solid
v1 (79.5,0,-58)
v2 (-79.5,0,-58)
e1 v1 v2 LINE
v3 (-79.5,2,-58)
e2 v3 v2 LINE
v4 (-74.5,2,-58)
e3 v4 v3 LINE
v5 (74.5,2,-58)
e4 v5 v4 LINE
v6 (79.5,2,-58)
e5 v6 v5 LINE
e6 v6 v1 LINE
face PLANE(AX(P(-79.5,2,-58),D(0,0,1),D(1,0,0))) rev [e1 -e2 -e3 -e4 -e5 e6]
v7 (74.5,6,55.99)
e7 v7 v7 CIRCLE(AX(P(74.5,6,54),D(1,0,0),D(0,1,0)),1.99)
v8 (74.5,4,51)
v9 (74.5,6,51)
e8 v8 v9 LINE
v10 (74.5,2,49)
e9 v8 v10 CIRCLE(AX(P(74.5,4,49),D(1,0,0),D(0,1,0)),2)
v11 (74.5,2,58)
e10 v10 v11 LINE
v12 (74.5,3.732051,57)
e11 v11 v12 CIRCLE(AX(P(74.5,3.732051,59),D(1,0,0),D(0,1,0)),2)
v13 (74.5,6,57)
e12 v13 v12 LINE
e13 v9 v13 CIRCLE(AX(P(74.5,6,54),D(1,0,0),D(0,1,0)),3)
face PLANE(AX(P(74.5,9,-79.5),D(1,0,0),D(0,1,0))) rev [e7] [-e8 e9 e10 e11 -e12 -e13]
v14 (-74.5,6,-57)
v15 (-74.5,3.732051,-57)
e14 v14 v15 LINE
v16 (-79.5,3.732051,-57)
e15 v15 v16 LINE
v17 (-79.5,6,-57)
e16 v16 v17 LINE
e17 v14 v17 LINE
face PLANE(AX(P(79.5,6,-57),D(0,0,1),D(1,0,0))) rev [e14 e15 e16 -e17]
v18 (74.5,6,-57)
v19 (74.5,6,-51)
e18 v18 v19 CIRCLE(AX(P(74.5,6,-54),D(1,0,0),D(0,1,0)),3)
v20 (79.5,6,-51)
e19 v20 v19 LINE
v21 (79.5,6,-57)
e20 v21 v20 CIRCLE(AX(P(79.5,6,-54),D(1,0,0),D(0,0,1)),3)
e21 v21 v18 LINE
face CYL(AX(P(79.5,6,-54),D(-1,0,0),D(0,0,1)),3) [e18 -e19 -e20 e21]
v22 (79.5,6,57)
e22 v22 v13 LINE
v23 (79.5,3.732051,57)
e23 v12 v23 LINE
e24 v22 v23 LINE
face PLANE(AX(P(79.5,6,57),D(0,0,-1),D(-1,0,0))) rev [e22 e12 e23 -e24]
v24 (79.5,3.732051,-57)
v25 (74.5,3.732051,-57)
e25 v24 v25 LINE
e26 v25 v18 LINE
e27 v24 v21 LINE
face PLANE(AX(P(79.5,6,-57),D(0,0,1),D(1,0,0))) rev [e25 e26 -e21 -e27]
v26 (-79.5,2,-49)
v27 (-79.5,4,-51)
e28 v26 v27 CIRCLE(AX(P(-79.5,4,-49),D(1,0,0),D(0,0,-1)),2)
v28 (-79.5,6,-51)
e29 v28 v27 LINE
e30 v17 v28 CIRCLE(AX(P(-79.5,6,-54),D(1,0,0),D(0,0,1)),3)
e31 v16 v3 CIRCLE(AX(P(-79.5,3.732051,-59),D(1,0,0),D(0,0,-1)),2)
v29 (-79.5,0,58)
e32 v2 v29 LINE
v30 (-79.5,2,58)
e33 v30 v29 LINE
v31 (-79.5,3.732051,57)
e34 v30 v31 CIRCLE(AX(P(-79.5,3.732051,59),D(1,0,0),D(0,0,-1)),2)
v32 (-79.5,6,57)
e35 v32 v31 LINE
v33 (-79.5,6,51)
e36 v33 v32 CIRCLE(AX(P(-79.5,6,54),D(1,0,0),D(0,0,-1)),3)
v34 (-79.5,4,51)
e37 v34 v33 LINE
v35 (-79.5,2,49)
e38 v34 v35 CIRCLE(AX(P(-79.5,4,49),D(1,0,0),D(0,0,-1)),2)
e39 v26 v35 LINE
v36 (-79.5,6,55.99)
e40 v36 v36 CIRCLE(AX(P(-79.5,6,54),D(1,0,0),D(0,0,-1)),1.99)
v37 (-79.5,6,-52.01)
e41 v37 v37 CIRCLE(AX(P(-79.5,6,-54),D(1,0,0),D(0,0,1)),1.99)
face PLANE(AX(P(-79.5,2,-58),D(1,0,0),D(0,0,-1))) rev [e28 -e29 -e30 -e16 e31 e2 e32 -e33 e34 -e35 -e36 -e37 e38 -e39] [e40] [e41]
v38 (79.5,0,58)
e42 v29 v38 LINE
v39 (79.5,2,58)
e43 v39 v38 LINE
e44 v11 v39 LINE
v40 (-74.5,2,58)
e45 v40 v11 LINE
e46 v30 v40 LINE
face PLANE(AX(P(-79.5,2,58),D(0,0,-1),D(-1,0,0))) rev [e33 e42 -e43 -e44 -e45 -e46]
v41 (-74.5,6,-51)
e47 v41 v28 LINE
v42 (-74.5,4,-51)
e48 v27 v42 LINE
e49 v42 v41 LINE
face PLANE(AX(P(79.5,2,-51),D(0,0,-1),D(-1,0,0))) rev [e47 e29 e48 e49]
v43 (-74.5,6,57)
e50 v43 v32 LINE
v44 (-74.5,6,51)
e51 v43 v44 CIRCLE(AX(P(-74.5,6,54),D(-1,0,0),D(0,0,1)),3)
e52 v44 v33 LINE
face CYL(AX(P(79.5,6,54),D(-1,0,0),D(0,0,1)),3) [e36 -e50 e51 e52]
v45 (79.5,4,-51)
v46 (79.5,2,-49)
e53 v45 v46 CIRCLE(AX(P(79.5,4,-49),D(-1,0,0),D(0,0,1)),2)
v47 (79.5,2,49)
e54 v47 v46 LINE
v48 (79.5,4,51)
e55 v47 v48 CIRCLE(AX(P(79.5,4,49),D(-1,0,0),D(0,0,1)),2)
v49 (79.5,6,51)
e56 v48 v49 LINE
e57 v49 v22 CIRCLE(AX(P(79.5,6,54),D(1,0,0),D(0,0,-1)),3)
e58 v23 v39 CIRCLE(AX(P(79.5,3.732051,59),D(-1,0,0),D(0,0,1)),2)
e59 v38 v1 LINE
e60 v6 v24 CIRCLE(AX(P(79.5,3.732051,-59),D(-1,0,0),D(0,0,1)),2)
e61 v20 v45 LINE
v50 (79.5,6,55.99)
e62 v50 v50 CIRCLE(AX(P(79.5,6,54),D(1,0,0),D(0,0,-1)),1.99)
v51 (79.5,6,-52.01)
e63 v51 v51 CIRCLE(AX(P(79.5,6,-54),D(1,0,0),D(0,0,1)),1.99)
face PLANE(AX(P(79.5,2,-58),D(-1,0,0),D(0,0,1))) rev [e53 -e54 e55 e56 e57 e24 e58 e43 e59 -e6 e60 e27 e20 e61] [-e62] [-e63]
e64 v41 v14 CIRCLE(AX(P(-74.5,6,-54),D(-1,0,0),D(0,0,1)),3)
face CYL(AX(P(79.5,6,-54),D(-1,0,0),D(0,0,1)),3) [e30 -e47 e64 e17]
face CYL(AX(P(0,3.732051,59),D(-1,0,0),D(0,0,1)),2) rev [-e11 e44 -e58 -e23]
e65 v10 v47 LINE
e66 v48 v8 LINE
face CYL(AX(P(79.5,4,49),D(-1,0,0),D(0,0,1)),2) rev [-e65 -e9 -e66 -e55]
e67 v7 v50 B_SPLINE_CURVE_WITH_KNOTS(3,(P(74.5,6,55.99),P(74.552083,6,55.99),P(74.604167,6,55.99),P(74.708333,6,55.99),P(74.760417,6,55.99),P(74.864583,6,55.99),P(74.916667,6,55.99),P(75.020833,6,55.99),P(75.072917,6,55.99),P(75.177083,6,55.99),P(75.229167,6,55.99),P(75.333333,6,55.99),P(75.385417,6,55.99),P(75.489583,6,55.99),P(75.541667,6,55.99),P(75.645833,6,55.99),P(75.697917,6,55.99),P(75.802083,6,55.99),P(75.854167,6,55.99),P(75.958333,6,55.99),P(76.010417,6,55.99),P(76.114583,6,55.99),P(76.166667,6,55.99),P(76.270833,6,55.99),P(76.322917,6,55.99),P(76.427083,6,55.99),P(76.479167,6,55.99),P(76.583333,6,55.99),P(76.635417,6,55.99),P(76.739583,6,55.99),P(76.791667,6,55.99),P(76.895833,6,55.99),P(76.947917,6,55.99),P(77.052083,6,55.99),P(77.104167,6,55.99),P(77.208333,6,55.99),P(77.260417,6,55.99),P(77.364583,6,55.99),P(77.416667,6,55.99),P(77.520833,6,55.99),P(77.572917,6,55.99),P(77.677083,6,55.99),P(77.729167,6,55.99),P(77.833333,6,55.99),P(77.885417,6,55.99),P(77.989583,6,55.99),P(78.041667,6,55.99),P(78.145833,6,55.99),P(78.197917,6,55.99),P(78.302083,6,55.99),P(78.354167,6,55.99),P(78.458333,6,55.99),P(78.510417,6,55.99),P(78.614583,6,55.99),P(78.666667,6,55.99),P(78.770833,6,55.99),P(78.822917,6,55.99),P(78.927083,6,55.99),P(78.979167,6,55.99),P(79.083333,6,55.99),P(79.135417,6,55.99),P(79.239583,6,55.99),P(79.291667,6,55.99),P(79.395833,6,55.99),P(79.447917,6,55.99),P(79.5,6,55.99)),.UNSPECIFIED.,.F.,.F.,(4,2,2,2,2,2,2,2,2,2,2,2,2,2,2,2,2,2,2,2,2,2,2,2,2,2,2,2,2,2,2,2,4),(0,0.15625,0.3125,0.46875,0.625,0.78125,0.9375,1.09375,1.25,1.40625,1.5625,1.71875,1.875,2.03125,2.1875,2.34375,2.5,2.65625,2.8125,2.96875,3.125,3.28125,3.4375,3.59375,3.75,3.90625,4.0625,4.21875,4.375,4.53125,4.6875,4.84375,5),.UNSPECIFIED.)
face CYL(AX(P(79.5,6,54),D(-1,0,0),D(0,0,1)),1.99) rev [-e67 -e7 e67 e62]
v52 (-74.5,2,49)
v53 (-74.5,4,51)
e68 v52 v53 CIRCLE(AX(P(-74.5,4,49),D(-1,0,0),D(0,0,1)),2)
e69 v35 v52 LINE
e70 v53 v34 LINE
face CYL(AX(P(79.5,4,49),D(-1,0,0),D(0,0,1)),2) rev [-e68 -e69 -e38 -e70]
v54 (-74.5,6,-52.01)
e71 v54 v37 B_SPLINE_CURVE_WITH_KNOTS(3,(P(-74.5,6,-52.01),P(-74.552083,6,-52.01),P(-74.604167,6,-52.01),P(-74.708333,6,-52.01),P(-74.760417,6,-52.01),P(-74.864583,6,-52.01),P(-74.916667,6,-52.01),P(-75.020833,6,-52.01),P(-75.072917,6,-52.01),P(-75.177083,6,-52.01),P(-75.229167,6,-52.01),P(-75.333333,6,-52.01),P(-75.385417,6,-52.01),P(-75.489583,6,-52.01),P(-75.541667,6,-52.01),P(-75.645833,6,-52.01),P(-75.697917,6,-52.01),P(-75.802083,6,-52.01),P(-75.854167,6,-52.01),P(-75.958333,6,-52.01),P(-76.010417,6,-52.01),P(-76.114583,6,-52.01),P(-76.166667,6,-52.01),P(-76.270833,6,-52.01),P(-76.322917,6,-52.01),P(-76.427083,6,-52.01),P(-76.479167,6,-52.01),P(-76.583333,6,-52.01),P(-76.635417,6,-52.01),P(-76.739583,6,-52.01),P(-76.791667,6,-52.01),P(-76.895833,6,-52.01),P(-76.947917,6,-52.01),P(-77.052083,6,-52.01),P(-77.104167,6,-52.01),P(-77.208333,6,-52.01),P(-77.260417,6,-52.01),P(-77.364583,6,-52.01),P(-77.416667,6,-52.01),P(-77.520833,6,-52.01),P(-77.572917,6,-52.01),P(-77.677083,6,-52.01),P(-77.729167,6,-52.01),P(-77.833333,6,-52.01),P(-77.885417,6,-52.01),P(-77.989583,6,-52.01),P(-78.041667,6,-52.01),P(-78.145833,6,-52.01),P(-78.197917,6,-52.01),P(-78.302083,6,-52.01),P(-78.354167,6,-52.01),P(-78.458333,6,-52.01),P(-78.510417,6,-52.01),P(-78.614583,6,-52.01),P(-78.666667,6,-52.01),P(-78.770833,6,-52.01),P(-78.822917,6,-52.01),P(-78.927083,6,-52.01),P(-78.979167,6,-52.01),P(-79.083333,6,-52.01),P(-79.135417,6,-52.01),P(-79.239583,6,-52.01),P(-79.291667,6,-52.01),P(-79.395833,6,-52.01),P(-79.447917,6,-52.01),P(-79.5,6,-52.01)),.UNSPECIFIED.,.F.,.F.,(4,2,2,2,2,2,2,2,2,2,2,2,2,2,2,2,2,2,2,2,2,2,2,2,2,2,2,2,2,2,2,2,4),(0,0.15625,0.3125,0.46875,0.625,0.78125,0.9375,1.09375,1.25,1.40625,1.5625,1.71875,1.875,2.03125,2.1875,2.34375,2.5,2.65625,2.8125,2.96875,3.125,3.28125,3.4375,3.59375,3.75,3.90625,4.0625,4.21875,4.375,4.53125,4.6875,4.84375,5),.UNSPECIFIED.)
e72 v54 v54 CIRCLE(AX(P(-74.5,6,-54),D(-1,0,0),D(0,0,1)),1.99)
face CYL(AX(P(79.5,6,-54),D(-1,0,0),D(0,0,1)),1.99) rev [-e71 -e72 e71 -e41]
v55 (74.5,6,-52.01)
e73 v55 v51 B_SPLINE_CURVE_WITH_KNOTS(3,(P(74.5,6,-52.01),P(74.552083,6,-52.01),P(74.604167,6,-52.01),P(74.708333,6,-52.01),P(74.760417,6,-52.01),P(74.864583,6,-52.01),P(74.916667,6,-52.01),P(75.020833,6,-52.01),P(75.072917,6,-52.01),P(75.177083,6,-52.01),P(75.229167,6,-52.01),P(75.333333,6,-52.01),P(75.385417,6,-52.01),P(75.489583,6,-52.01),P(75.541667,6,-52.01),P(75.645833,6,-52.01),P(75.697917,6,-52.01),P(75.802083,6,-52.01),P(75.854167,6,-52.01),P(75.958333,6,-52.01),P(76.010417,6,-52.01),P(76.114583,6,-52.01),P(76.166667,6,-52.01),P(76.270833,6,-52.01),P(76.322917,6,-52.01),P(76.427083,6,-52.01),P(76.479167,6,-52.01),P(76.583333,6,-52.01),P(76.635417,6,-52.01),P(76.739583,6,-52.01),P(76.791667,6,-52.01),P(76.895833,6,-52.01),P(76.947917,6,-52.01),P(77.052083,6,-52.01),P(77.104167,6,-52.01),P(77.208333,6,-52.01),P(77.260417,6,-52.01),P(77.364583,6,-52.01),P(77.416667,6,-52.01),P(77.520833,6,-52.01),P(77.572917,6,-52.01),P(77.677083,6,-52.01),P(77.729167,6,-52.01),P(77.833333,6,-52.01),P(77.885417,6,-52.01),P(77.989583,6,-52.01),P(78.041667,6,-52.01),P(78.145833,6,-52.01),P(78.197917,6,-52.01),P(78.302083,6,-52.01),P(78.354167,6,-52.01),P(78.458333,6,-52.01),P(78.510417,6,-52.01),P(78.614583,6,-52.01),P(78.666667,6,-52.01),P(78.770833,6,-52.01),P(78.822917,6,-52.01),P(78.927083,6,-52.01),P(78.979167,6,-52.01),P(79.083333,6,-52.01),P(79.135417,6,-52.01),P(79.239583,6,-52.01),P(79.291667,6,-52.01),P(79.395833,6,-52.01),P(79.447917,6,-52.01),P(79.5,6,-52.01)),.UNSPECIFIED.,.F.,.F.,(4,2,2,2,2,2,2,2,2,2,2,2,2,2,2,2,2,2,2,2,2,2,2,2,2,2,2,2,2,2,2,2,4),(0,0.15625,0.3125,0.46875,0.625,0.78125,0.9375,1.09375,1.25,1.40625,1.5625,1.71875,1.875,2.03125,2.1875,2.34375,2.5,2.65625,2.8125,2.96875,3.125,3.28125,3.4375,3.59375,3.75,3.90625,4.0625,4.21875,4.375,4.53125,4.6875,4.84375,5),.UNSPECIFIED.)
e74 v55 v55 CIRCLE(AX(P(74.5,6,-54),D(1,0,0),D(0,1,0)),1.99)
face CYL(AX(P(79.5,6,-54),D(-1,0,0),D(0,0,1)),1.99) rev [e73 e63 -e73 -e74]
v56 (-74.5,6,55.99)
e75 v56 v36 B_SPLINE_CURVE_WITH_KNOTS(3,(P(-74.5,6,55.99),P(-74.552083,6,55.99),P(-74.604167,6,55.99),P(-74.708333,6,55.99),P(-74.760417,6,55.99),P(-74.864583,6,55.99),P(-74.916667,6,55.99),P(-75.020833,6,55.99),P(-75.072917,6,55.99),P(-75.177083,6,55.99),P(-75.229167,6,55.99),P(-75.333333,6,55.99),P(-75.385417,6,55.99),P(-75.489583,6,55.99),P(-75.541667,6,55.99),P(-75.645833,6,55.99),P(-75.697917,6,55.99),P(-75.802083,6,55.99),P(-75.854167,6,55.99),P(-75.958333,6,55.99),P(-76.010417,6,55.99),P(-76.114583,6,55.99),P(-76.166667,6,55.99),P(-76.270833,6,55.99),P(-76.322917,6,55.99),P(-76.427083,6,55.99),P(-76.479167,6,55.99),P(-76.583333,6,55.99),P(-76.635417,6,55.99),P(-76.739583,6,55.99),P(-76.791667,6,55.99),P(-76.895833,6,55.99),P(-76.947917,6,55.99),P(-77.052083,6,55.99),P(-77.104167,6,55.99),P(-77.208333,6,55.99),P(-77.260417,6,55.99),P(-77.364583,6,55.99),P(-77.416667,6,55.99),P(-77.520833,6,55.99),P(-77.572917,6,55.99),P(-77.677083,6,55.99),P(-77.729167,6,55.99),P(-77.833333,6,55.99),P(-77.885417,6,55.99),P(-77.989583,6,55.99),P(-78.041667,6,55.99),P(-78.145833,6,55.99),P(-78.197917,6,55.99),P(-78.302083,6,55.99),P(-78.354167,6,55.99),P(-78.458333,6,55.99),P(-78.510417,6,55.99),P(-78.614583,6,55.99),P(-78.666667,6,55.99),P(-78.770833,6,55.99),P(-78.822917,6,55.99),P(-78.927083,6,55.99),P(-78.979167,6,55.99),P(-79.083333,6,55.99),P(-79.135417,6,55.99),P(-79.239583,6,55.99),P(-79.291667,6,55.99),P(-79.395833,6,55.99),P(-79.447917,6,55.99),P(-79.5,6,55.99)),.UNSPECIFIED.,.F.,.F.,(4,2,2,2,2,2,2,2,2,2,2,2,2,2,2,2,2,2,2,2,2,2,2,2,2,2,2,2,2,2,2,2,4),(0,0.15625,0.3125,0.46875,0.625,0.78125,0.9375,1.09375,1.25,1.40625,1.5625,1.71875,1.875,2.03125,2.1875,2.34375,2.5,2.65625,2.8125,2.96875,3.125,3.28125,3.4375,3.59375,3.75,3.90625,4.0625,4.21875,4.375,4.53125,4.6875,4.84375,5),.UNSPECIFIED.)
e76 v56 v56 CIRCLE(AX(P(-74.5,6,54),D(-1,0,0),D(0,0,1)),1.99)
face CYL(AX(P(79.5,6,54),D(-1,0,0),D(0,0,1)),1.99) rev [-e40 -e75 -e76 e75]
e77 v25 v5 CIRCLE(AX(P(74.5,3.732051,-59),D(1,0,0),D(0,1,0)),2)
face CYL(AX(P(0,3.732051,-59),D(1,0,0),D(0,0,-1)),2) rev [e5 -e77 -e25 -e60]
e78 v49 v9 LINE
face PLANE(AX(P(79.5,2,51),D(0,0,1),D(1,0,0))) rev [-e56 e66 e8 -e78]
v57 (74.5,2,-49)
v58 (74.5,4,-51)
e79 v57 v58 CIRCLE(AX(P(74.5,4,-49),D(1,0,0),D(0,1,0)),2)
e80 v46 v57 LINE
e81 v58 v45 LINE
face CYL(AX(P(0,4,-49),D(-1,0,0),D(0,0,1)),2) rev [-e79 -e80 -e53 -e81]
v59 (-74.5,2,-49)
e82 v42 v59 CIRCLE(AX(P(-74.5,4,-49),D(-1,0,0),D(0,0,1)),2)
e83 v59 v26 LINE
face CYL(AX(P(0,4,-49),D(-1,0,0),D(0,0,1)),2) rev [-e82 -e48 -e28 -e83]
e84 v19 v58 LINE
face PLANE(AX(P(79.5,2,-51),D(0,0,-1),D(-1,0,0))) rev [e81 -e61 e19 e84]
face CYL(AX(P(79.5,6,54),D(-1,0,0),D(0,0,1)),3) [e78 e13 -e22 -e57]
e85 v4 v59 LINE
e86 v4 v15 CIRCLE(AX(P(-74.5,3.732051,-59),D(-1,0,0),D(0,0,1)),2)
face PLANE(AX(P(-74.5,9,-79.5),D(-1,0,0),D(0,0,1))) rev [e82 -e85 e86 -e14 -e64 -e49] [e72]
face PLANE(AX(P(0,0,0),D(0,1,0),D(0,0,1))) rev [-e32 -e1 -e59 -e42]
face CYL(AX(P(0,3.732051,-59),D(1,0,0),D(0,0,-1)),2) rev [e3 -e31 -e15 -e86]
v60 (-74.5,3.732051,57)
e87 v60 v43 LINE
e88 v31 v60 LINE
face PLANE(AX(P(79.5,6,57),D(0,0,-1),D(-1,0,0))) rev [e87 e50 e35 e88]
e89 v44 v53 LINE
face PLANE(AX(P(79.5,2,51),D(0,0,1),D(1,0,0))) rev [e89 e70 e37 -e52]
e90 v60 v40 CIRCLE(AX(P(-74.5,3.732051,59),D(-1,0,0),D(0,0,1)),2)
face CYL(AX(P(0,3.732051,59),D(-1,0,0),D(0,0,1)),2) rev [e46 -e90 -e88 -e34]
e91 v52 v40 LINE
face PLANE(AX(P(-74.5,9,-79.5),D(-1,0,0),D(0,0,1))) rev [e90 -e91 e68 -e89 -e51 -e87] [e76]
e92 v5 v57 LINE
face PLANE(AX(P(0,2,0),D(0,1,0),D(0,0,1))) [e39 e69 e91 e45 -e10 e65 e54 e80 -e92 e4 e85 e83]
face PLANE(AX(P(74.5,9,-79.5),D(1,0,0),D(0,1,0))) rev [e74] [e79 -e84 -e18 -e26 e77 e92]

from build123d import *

# Parameters (mm, degrees)
SKETCH_1_W          = 159
SKETCH_1_H          = 116
EXTRUDE_1_DEPTH     = 2
SKETCH_3_R          = 1.99
EXTRUDE_3_DEPTH     = 79.5
SKETCH_4_W          = 149
SKETCH_4_H          = 7
CUT_EXTRUDE_2_DEPTH = 79.5
FILLET_3_R          = 2


with BuildPart() as part:
    # 草图1 → 凸台-拉伸1 (new body)
    with BuildSketch(Plane(origin=(0, 0, 0), x_dir=(1, 0, 0), z_dir=(0, 1, 0))):
        Rectangle(SKETCH_1_W, SKETCH_1_H)
    extrude(amount=EXTRUDE_1_DEPTH)

    # 草图3 → 凸台-拉伸3 (add, symmetric)
    # profile 1 of 2: a face of its own
    with BuildSketch(Plane(origin=(0, 0, 0), x_dir=(0, 0, -1), z_dir=(1, 0, 0))):
        with BuildLine():
            Line((-57, 6), (-57, 2))
            Line((-57, 2), (-51, 2))
            Line((-51, 2), (-51, 6))
            ThreePointArc((-51, 6), (-54, 9), (-57, 6))
        make_face()
        with Locations(Location((-54, 6, 0), (0, 0, 180))):
            Circle(SKETCH_3_R, mode=Mode.SUBTRACT)
    # profile 2 of 2: a face of its own
    with BuildSketch(Plane(origin=(0, 0, 0), x_dir=(0, 0, -1), z_dir=(1, 0, 0))):
        with BuildLine():
            Line((51, 2), (51, 6))
            ThreePointArc((51, 6), (54, 9), (57, 6))
            Line((57, 6), (57, 2))
            Line((57, 2), (51, 2))
        make_face()
        with Locations(Location((54, 6, 0), (0, 0, 180))):
            Circle(SKETCH_3_R, mode=Mode.SUBTRACT)
    extrude(amount=EXTRUDE_3_DEPTH, both=True)

    # 草图4 → 切除-拉伸2 (cut, symmetric)
    with BuildSketch(Plane.XY):
        with Locations((0, 5.5)):
            Rectangle(SKETCH_4_W, SKETCH_4_H)
    extrude(amount=CUT_EXTRUDE_2_DEPTH, both=True, mode=Mode.SUBTRACT)

    # 圆角3
    # the kernel refuses this fillet: 2 mm, written as the material it adds along each edge
    with BuildSketch(Plane(origin=(74.5, 2, 57), x_dir=(0, 1, 0), z_dir=(1, 0, 0))) as fillet_3_piece_1:
        with BuildLine():
            CenterArc((1.732050808, 2), FILLET_3_R, 210, 60)
            Line((0, 1), (-0.034641016, 0.98))
            ThreePointArc((-0.034641016, 0.98), (-0.04, 0.5), (-0.04, 0))
            Line((-0.04, 0), (0, -0.04))
            Line((0, -0.04), (1.732050808, -0.04))
            Line((1.732050808, -0.04), (1.732050808, 0))
        make_face()
    extrude(amount=5)
    with BuildSketch(Plane(origin=(74.5, 2, 51), x_dir=(0, 1, 0), z_dir=(1, 0, 0)), Plane(origin=(-79.5, 2, -51), x_dir=(0, 0, 1), z_dir=(1, 0, 0))) as fillet_3_piece_2:
        with BuildLine():
            CenterArc((FILLET_3_R, -FILLET_3_R), FILLET_3_R, 90, 90)
            Line((0, -FILLET_3_R), (-FILLET_3_R * 0.02, -FILLET_3_R))
            Line((-FILLET_3_R * 0.02, -FILLET_3_R), (-FILLET_3_R * 0.02, FILLET_3_R * 0.02))
            Line((-FILLET_3_R * 0.02, FILLET_3_R * 0.02), (FILLET_3_R, FILLET_3_R * 0.02))
            Line((FILLET_3_R, FILLET_3_R * 0.02), (FILLET_3_R, 0))
        make_face()
    extrude(amount=5)
    with BuildSketch(Plane(origin=(74.5, 2, -51), x_dir=(0, 1, 0), z_dir=(1, 0, 0)), Plane(origin=(-79.5, 2, 51), x_dir=(0, 0, -1), z_dir=(1, 0, 0))) as fillet_3_piece_3:
        with BuildLine():
            CenterArc((FILLET_3_R, FILLET_3_R), FILLET_3_R, 180, 90)
            Line((0, FILLET_3_R), (-FILLET_3_R * 0.02, FILLET_3_R))
            Line((-FILLET_3_R * 0.02, FILLET_3_R), (-FILLET_3_R * 0.02, -FILLET_3_R * 0.02))
            Line((-FILLET_3_R * 0.02, -FILLET_3_R * 0.02), (FILLET_3_R, -FILLET_3_R * 0.02))
            Line((FILLET_3_R, -FILLET_3_R * 0.02), (FILLET_3_R, 0))
        make_face()
    extrude(amount=5)
    with BuildSketch(Plane(origin=(74.5, 2, -57), x_dir=(0, 1, 0), z_dir=(1, 0, 0))) as fillet_3_piece_4:
        with BuildLine():
            CenterArc((1.732050808, -2), FILLET_3_R, 90, 60)
            Line((0, -1), (-0.034641016, -0.98))
            ThreePointArc((-0.034641016, -0.98), (-0.04, -0.5), (-0.04, 0))
            Line((-0.04, 0), (0, 0.04))
            Line((0, 0.04), (1.732050808, 0.04))
            Line((1.732050808, 0.04), (1.732050808, 0))
        make_face()
    extrude(amount=5)
    with BuildSketch(Plane(origin=(-79.5, 2, -57), x_dir=(0, 0, -1), z_dir=(1, 0, 0))) as fillet_3_piece_5:
        with BuildLine():
            CenterArc((2, 1.732050808), FILLET_3_R, 180, 60)
            Line((0, 1.732050808), (-0.04, 1.732050808))
            Line((-0.04, 1.732050808), (-0.04, 0))
            Line((-0.04, 0), (0, -0.04))
            ThreePointArc((0, -0.04), (0.5, -0.04), (0.98, -0.034641016))
            Line((0.98, -0.034641016), (1, 0))
        make_face()
    extrude(amount=5)
    with BuildSketch(Plane(origin=(-79.5, 2, 57), x_dir=(0, 0, 1), z_dir=(1, 0, 0))) as fillet_3_piece_6:
        with BuildLine():
            CenterArc((2, -1.732050808), FILLET_3_R, 120, 60)
            Line((0, -1.732050808), (-0.04, -1.732050808))
            Line((-0.04, -1.732050808), (-0.04, 0))
            Line((-0.04, 0), (0, 0.04))
            ThreePointArc((0, 0.04), (0.5, 0.04), (0.98, 0.034641016))
            Line((0.98, 0.034641016), (1, 0))
        make_face()
    extrude(amount=5)


solid = part.part
